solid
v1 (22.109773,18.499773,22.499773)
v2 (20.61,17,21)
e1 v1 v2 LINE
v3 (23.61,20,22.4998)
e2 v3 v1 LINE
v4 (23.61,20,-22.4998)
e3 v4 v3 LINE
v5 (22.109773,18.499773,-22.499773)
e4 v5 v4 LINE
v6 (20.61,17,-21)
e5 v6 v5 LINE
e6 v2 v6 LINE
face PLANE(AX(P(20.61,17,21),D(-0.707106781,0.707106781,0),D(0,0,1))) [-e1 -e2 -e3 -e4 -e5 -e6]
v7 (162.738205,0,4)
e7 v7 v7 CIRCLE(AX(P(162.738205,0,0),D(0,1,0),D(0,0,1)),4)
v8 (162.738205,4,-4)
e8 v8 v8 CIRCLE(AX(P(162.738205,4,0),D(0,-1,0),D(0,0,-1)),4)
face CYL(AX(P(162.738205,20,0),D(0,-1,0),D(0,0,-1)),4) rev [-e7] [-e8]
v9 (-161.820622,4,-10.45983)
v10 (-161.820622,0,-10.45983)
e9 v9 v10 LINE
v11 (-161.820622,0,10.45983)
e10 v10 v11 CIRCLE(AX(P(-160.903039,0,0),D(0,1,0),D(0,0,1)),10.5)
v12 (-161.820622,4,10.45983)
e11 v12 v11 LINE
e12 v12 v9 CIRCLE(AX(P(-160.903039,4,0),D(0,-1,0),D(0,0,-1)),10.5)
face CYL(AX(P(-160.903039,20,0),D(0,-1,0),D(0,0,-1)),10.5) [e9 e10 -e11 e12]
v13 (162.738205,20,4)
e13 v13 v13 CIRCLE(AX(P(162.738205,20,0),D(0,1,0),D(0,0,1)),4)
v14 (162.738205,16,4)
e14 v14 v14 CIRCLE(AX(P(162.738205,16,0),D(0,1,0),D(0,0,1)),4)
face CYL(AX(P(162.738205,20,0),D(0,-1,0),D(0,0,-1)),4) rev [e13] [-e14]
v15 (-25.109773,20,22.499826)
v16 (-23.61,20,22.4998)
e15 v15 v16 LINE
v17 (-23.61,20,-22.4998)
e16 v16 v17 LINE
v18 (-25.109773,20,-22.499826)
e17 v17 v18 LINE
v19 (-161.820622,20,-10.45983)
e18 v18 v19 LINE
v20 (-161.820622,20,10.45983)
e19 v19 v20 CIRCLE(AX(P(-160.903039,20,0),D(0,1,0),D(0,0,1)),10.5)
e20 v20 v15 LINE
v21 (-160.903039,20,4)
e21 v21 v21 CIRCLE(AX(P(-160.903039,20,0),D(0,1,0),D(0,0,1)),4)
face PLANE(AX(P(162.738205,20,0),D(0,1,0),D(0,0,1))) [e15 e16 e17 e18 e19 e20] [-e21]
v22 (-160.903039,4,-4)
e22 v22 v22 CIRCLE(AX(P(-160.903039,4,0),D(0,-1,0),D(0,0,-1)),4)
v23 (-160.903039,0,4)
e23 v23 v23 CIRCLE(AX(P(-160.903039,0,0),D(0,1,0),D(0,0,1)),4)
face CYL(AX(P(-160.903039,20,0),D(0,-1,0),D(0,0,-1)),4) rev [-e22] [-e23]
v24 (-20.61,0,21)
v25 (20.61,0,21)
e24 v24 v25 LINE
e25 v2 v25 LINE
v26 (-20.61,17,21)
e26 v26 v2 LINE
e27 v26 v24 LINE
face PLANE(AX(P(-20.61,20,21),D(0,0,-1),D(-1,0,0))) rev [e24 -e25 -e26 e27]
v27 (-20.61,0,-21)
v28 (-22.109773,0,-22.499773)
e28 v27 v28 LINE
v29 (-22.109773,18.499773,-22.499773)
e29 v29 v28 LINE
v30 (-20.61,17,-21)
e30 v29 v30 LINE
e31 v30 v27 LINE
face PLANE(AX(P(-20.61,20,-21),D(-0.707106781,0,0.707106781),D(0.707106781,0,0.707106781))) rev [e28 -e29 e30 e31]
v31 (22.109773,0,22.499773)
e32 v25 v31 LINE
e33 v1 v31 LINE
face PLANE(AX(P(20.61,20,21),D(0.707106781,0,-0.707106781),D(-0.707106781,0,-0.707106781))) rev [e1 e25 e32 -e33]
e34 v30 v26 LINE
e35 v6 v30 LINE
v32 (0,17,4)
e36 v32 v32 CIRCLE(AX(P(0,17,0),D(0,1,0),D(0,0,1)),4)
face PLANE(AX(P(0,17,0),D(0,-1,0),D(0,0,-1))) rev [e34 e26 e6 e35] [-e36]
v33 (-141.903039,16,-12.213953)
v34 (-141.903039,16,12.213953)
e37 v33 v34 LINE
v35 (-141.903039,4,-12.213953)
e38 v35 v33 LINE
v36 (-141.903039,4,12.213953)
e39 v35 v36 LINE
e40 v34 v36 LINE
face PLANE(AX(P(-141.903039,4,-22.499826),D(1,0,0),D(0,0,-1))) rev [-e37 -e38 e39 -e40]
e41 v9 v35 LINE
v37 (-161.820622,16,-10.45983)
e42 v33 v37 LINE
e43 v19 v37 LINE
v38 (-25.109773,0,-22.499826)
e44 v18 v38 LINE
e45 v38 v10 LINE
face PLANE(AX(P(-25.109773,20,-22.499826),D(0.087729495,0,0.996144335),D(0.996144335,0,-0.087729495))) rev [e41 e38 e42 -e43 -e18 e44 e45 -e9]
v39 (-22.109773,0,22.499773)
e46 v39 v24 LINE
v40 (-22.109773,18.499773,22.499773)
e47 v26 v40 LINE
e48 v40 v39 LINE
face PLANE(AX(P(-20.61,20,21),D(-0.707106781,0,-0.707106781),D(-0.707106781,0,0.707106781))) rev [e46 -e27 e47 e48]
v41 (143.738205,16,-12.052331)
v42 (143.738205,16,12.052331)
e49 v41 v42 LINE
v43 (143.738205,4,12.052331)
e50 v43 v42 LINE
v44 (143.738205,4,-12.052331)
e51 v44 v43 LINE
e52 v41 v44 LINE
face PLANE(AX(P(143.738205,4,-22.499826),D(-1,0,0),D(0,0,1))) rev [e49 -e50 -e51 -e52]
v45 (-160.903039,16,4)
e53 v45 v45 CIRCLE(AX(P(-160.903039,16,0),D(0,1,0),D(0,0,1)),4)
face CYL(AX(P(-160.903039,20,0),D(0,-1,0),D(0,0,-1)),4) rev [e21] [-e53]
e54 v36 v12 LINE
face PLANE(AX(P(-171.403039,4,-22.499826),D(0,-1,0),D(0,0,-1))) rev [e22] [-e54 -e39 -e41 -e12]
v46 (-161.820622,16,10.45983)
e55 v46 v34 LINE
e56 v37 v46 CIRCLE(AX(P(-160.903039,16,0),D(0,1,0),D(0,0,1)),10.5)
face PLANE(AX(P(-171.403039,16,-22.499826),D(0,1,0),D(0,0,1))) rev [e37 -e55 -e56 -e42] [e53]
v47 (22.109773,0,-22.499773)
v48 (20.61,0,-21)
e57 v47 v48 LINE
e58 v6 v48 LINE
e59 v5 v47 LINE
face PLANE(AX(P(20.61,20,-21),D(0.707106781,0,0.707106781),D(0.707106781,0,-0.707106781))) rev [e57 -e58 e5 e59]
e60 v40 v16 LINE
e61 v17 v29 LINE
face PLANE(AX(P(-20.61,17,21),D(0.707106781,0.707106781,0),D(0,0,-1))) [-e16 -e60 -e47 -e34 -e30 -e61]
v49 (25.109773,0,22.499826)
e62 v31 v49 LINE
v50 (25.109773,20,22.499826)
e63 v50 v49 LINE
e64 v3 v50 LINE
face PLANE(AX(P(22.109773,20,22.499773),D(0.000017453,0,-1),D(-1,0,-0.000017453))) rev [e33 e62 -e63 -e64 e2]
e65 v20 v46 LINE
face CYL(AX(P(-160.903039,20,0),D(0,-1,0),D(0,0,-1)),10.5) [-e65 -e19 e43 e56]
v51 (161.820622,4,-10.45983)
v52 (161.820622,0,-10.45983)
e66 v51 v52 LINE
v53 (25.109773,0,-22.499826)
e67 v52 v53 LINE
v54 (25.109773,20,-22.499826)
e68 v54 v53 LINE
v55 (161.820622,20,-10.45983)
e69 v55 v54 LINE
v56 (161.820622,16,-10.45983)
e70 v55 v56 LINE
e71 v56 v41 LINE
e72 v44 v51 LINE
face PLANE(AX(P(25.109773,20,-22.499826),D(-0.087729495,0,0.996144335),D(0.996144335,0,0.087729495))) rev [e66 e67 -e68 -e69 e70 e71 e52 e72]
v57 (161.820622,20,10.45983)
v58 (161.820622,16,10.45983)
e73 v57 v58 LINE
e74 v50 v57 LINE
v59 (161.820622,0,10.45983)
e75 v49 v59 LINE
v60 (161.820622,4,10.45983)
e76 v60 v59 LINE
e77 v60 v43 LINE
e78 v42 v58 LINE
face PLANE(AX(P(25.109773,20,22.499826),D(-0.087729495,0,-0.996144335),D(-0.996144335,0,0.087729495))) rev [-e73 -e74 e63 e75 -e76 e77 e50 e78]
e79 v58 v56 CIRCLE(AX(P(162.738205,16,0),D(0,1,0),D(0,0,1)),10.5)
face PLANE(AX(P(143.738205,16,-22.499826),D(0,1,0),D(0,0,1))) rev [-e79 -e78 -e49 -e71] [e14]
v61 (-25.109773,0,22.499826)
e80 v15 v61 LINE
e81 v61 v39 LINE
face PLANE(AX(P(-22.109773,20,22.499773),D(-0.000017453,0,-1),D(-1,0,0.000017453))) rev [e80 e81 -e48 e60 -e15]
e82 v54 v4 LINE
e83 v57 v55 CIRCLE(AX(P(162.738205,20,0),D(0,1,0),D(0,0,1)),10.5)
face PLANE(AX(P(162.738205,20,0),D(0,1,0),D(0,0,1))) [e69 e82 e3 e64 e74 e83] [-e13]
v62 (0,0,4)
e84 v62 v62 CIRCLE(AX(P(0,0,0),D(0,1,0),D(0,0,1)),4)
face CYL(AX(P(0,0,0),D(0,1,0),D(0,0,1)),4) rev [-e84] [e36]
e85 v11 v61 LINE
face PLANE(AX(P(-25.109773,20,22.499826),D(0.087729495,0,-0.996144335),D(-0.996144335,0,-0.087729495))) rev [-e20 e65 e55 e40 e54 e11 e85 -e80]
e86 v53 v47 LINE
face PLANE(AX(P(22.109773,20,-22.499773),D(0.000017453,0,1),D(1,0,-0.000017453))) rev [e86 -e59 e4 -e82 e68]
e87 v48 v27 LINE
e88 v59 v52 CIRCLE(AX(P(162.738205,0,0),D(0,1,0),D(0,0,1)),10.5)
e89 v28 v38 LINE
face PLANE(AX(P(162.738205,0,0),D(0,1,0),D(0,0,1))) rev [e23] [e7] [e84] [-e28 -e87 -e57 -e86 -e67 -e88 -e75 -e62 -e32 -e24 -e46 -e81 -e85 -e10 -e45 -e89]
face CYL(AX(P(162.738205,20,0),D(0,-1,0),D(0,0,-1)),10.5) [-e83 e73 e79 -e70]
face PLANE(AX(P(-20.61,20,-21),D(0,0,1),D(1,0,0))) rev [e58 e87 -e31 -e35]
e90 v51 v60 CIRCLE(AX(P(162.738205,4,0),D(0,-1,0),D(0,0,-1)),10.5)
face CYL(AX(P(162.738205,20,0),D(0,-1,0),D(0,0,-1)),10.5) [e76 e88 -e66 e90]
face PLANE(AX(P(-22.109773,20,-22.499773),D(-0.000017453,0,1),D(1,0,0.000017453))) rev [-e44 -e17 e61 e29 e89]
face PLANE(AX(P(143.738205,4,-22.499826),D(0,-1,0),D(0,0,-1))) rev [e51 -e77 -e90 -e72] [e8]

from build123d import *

# Parameters (mm, degrees)
CROQUIS1_R              = 4
SALIENTE_EXTRUIR1_DEPTH = 20
CROQUIS2_W              = 29.5
CROQUIS2_H              = 12
CORTAR_EXTRUIR1_DEPTH   = 180.732329924
CROQUIS3_W              = 41.22
CROQUIS3_H              = 42
CORTAR_EXTRUIR2_DEPTH   = 3
CHAFL_N1_SIZE           = 3
CROQUIS4_R              = 4
CORTAR_EXTRUIR3_DEPTH   = 176.518425627


with BuildPart() as part:
    # Croquis1 → Saliente-Extruir1 (new body)
    with BuildSketch(Plane(origin=(0, 0, 0), x_dir=(1, 0, 0), z_dir=(0, 1, 0))):
        with BuildLine():
            Line((20.61, 21), (22.109773483, 22.499773483))
            Line((22.109773483, 22.499773483), (25.109773482, 22.499825843))
            Line((25.109773482, 22.499825843), (161.820621985, 10.459829919))
            ThreePointArc((161.820621985, 10.459829919), (173.238204711, 0), (161.820621985, -10.459829919))
            Line((161.820621985, -10.459829919), (25.109773482, -22.499825843))
            Line((25.109773482, -22.499825843), (22.109773483, -22.499773483))
            Line((22.109773483, -22.499773483), (20.61, -21))
            Line((20.61, -21), (-20.61, -21))
            Line((-20.61, -21), (-22.109773483, -22.499773483))
            Line((-22.109773483, -22.499773483), (-25.109773482, -22.499825843))
            Line((-25.109773482, -22.499825843), (-161.820621985, -10.459829919))
            ThreePointArc((-161.820621985, -10.459829919), (-171.403039258, 0), (-161.820621985, 10.459829919))
            Line((-161.820621985, 10.459829919), (-25.109773482, 22.499825843))
            Line((-25.109773482, 22.499825843), (-22.109773483, 22.499773483))
            Line((-22.109773483, 22.499773483), (-20.61, 21))
            Line((-20.61, 21), (20.61, 21))
        make_face()
        with Locations(Location((-160.903039258, 0, 0), (0, 0, 270))):
            Circle(CROQUIS1_R, mode=Mode.SUBTRACT)
        with Locations(Location((162.738204711, 0, 0), (0, 0, 270))):
            Circle(CROQUIS1_R, mode=Mode.SUBTRACT)
    extrude(amount=SALIENTE_EXTRUIR1_DEPTH)

    # Croquis2 → Cortar-Extruir1 (cut, through all)
    with BuildSketch(Plane.XY.offset(21)):
        with Locations((-156.653039258, 10)):
            Rectangle(CROQUIS2_W, CROQUIS2_H)
        with Locations((158.488204711, 10)):
            Rectangle(CROQUIS2_W, CROQUIS2_H)
    extrude(amount=-CORTAR_EXTRUIR1_DEPTH, mode=Mode.SUBTRACT)

    # Croquis3 → Cortar-Extruir2 (cut)
    with BuildSketch(Plane(origin=(0, 20, 0), x_dir=(1, 0, 0), z_dir=(0, 1, 0))):
        Rectangle(CROQUIS3_W, CROQUIS3_H)
    extrude(amount=-CORTAR_EXTRUIR2_DEPTH, mode=Mode.SUBTRACT)

    # Chaflán1
    chafl_n1_edges = [part.edges().sort_by_distance(p)[0] for p in [
        (20.61, 20, 0),
        (-20.61, 20, 0),
    ]]
    chamfer(chafl_n1_edges, length=CHAFL_N1_SIZE - 0.0001)  # a hair under: the kernel refuses the full size

    # Croquis4 → Cortar-Extruir3 (cut, through all)
    with BuildSketch(Plane(origin=(0, 17, 0), x_dir=(1, 0, 0), z_dir=(0, 1, 0))):
        with Locations(Location((0, 0, 0), (0, 0, 270))):
            Circle(CROQUIS4_R)
    extrude(amount=-CORTAR_EXTRUIR3_DEPTH, mode=Mode.SUBTRACT)


solid = part.part
